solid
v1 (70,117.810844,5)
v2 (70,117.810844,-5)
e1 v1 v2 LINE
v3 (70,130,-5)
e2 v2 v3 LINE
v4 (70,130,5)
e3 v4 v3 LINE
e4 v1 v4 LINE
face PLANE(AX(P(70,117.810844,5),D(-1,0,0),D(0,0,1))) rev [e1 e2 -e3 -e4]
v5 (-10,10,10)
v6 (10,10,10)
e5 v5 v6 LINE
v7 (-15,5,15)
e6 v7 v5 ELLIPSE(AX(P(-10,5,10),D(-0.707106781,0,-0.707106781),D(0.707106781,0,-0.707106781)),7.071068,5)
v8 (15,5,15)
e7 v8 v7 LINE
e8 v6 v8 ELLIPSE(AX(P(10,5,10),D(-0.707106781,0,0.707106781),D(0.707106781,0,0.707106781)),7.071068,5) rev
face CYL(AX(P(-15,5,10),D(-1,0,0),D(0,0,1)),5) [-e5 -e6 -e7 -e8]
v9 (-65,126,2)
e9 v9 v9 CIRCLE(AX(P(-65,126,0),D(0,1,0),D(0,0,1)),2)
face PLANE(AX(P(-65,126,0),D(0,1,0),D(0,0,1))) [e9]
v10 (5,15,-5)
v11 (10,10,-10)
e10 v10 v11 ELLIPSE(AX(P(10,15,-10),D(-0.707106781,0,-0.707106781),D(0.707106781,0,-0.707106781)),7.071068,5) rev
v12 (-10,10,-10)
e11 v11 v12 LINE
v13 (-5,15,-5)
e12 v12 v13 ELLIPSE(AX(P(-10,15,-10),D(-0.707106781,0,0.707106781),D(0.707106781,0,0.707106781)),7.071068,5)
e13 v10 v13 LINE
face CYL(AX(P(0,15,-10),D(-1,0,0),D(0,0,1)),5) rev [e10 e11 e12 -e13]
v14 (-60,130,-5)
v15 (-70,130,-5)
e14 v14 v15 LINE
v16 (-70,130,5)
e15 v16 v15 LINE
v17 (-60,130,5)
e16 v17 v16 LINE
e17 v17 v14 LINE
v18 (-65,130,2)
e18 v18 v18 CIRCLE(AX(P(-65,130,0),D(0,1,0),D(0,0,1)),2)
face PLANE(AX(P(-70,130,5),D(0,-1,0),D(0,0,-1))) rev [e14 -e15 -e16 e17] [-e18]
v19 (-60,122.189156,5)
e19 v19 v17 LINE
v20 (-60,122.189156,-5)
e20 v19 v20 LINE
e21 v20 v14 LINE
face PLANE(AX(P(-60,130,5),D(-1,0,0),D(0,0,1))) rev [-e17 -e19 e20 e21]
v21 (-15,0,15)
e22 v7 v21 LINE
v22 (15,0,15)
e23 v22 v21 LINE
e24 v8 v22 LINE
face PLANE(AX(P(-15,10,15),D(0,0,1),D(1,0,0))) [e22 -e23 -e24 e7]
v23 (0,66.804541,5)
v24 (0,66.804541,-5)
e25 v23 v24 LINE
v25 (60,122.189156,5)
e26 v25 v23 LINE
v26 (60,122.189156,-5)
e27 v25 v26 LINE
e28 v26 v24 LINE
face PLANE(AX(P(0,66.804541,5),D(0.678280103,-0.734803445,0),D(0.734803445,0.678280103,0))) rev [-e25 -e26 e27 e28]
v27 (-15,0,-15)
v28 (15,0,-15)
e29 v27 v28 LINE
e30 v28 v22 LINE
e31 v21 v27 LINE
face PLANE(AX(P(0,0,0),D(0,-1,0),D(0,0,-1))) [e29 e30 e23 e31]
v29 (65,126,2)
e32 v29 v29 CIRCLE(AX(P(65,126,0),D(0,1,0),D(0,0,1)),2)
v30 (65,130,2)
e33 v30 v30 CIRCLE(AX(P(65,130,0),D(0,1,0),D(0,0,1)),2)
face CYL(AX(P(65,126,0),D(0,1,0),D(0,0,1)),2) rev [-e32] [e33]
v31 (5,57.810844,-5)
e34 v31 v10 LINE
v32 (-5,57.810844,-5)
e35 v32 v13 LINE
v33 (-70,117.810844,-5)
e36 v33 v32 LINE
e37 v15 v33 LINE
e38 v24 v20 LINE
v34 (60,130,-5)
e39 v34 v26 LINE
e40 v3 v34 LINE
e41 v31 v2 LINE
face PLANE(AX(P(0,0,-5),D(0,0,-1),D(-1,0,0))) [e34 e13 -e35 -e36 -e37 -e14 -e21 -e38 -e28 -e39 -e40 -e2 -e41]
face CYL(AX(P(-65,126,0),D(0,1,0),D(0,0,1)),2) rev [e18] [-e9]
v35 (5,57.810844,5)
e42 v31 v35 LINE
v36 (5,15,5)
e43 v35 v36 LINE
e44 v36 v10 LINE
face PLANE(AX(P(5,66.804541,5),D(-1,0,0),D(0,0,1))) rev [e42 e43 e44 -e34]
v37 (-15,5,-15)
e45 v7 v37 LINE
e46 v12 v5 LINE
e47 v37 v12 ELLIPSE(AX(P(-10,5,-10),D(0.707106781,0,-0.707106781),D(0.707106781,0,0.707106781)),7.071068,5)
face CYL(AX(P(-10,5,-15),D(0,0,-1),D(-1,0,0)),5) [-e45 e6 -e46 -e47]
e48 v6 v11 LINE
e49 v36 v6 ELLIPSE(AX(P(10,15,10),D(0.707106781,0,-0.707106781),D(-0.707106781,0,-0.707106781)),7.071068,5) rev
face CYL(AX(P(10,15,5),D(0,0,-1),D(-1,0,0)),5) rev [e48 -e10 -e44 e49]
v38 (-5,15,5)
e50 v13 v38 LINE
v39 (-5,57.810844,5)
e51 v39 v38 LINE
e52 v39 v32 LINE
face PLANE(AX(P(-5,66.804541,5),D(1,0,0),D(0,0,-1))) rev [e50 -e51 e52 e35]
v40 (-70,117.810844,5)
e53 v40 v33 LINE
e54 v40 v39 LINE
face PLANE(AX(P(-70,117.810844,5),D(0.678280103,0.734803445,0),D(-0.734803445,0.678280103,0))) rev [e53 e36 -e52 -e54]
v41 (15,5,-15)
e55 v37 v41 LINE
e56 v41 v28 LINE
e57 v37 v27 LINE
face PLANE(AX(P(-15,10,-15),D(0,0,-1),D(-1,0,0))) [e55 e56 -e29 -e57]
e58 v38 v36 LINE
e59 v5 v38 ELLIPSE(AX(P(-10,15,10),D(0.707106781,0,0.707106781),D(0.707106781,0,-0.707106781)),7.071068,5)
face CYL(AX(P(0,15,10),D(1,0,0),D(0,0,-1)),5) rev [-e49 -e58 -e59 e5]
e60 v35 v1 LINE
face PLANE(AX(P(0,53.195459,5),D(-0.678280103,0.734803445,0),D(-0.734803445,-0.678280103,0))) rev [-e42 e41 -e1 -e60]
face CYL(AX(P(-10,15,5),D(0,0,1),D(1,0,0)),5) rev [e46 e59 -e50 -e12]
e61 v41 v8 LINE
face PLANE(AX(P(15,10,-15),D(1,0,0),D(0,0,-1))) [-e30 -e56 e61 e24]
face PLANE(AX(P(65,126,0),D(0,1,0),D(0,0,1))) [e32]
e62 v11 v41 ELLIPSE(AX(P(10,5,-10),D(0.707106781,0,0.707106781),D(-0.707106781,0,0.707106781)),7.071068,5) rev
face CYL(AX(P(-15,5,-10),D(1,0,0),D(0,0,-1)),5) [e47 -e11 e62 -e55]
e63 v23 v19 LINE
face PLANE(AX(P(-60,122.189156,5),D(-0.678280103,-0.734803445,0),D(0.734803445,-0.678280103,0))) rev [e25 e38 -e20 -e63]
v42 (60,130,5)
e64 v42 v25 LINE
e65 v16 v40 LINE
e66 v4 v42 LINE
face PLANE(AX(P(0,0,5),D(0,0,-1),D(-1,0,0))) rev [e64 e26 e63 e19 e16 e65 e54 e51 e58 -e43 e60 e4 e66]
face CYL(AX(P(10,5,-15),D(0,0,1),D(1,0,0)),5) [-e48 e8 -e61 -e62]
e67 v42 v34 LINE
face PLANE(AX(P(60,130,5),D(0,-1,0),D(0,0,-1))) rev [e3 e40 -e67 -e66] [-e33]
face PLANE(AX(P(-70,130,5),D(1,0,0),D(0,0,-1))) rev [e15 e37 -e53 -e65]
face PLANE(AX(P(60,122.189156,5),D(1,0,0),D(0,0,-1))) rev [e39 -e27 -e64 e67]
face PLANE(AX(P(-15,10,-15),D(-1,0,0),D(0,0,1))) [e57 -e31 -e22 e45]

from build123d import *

# Parameters (mm, degrees)
BOSS_EXTRUDE3_DEPTH = 5
SKETCH32_W          = 10
SKETCH32_H          = 10
BOSS_EXTRUDE5_DEPTH = 57.810843841
SKETCH33_W          = 30
SKETCH33_H          = 30
BOSS_EXTRUDE6_DEPTH = 10
FILLET2_R           = 5
SKETCH34_R          = 2
CUT_EXTRUDE2_DEPTH  = 4


with BuildPart() as part:
    # Sketch11 → Boss-Extrude3 (new, symmetric)
    with BuildSketch(Plane.XY):
        Polygon((-70, 130), (-70, 117.810843841), (0, 53.195459226), (70, 117.810843841), (70, 130), (60, 130), (60, 122.189156159), (0, 66.804540774), (-60, 122.189156159), (-60, 130), align=None)
    extrude(amount=BOSS_EXTRUDE3_DEPTH, both=True)

    # Sketch32 → Boss-Extrude5 (add)
    with BuildSketch(Plane(origin=(0, 0, 0), x_dir=(1, 0, 0), z_dir=(0, 1, 0))):
        Rectangle(SKETCH32_W, SKETCH32_H)
    extrude(amount=BOSS_EXTRUDE5_DEPTH)

    # Sketch33 → Boss-Extrude6 (add)
    with BuildSketch(Plane.XZ):
        Rectangle(SKETCH33_W, SKETCH33_H)
    extrude(amount=-BOSS_EXTRUDE6_DEPTH)

    # Fillet2
    fillet2_edges = [part.edges().sort_by_distance(p)[0] for p in [
        (-5, 10, 0),
        (0, 10, -5),
        (15, 10, 0),
        (0, 10, -15),
        (-15, 10, 0),
        (0, 10, 15),
        (0, 10, 5),
        (5, 10, 0),
    ]]
    fillet(fillet2_edges, radius=FILLET2_R - 0.0001)  # a hair under: the kernel refuses the full size

    # Sketch34 → Cut-Extrude2 (cut)
    with BuildSketch(Plane(origin=(0, 130, 0), x_dir=(1, 0, 0), z_dir=(0, 1, 0))):
        with Locations(Location((-65, 0, 0), (0, 0, 270))):
            Circle(SKETCH34_R)
        with Locations(Location((65, 0, 0), (0, 0, 270))):
            Circle(SKETCH34_R)
    extrude(amount=-CUT_EXTRUDE2_DEPTH, mode=Mode.SUBTRACT)


solid = part.part
